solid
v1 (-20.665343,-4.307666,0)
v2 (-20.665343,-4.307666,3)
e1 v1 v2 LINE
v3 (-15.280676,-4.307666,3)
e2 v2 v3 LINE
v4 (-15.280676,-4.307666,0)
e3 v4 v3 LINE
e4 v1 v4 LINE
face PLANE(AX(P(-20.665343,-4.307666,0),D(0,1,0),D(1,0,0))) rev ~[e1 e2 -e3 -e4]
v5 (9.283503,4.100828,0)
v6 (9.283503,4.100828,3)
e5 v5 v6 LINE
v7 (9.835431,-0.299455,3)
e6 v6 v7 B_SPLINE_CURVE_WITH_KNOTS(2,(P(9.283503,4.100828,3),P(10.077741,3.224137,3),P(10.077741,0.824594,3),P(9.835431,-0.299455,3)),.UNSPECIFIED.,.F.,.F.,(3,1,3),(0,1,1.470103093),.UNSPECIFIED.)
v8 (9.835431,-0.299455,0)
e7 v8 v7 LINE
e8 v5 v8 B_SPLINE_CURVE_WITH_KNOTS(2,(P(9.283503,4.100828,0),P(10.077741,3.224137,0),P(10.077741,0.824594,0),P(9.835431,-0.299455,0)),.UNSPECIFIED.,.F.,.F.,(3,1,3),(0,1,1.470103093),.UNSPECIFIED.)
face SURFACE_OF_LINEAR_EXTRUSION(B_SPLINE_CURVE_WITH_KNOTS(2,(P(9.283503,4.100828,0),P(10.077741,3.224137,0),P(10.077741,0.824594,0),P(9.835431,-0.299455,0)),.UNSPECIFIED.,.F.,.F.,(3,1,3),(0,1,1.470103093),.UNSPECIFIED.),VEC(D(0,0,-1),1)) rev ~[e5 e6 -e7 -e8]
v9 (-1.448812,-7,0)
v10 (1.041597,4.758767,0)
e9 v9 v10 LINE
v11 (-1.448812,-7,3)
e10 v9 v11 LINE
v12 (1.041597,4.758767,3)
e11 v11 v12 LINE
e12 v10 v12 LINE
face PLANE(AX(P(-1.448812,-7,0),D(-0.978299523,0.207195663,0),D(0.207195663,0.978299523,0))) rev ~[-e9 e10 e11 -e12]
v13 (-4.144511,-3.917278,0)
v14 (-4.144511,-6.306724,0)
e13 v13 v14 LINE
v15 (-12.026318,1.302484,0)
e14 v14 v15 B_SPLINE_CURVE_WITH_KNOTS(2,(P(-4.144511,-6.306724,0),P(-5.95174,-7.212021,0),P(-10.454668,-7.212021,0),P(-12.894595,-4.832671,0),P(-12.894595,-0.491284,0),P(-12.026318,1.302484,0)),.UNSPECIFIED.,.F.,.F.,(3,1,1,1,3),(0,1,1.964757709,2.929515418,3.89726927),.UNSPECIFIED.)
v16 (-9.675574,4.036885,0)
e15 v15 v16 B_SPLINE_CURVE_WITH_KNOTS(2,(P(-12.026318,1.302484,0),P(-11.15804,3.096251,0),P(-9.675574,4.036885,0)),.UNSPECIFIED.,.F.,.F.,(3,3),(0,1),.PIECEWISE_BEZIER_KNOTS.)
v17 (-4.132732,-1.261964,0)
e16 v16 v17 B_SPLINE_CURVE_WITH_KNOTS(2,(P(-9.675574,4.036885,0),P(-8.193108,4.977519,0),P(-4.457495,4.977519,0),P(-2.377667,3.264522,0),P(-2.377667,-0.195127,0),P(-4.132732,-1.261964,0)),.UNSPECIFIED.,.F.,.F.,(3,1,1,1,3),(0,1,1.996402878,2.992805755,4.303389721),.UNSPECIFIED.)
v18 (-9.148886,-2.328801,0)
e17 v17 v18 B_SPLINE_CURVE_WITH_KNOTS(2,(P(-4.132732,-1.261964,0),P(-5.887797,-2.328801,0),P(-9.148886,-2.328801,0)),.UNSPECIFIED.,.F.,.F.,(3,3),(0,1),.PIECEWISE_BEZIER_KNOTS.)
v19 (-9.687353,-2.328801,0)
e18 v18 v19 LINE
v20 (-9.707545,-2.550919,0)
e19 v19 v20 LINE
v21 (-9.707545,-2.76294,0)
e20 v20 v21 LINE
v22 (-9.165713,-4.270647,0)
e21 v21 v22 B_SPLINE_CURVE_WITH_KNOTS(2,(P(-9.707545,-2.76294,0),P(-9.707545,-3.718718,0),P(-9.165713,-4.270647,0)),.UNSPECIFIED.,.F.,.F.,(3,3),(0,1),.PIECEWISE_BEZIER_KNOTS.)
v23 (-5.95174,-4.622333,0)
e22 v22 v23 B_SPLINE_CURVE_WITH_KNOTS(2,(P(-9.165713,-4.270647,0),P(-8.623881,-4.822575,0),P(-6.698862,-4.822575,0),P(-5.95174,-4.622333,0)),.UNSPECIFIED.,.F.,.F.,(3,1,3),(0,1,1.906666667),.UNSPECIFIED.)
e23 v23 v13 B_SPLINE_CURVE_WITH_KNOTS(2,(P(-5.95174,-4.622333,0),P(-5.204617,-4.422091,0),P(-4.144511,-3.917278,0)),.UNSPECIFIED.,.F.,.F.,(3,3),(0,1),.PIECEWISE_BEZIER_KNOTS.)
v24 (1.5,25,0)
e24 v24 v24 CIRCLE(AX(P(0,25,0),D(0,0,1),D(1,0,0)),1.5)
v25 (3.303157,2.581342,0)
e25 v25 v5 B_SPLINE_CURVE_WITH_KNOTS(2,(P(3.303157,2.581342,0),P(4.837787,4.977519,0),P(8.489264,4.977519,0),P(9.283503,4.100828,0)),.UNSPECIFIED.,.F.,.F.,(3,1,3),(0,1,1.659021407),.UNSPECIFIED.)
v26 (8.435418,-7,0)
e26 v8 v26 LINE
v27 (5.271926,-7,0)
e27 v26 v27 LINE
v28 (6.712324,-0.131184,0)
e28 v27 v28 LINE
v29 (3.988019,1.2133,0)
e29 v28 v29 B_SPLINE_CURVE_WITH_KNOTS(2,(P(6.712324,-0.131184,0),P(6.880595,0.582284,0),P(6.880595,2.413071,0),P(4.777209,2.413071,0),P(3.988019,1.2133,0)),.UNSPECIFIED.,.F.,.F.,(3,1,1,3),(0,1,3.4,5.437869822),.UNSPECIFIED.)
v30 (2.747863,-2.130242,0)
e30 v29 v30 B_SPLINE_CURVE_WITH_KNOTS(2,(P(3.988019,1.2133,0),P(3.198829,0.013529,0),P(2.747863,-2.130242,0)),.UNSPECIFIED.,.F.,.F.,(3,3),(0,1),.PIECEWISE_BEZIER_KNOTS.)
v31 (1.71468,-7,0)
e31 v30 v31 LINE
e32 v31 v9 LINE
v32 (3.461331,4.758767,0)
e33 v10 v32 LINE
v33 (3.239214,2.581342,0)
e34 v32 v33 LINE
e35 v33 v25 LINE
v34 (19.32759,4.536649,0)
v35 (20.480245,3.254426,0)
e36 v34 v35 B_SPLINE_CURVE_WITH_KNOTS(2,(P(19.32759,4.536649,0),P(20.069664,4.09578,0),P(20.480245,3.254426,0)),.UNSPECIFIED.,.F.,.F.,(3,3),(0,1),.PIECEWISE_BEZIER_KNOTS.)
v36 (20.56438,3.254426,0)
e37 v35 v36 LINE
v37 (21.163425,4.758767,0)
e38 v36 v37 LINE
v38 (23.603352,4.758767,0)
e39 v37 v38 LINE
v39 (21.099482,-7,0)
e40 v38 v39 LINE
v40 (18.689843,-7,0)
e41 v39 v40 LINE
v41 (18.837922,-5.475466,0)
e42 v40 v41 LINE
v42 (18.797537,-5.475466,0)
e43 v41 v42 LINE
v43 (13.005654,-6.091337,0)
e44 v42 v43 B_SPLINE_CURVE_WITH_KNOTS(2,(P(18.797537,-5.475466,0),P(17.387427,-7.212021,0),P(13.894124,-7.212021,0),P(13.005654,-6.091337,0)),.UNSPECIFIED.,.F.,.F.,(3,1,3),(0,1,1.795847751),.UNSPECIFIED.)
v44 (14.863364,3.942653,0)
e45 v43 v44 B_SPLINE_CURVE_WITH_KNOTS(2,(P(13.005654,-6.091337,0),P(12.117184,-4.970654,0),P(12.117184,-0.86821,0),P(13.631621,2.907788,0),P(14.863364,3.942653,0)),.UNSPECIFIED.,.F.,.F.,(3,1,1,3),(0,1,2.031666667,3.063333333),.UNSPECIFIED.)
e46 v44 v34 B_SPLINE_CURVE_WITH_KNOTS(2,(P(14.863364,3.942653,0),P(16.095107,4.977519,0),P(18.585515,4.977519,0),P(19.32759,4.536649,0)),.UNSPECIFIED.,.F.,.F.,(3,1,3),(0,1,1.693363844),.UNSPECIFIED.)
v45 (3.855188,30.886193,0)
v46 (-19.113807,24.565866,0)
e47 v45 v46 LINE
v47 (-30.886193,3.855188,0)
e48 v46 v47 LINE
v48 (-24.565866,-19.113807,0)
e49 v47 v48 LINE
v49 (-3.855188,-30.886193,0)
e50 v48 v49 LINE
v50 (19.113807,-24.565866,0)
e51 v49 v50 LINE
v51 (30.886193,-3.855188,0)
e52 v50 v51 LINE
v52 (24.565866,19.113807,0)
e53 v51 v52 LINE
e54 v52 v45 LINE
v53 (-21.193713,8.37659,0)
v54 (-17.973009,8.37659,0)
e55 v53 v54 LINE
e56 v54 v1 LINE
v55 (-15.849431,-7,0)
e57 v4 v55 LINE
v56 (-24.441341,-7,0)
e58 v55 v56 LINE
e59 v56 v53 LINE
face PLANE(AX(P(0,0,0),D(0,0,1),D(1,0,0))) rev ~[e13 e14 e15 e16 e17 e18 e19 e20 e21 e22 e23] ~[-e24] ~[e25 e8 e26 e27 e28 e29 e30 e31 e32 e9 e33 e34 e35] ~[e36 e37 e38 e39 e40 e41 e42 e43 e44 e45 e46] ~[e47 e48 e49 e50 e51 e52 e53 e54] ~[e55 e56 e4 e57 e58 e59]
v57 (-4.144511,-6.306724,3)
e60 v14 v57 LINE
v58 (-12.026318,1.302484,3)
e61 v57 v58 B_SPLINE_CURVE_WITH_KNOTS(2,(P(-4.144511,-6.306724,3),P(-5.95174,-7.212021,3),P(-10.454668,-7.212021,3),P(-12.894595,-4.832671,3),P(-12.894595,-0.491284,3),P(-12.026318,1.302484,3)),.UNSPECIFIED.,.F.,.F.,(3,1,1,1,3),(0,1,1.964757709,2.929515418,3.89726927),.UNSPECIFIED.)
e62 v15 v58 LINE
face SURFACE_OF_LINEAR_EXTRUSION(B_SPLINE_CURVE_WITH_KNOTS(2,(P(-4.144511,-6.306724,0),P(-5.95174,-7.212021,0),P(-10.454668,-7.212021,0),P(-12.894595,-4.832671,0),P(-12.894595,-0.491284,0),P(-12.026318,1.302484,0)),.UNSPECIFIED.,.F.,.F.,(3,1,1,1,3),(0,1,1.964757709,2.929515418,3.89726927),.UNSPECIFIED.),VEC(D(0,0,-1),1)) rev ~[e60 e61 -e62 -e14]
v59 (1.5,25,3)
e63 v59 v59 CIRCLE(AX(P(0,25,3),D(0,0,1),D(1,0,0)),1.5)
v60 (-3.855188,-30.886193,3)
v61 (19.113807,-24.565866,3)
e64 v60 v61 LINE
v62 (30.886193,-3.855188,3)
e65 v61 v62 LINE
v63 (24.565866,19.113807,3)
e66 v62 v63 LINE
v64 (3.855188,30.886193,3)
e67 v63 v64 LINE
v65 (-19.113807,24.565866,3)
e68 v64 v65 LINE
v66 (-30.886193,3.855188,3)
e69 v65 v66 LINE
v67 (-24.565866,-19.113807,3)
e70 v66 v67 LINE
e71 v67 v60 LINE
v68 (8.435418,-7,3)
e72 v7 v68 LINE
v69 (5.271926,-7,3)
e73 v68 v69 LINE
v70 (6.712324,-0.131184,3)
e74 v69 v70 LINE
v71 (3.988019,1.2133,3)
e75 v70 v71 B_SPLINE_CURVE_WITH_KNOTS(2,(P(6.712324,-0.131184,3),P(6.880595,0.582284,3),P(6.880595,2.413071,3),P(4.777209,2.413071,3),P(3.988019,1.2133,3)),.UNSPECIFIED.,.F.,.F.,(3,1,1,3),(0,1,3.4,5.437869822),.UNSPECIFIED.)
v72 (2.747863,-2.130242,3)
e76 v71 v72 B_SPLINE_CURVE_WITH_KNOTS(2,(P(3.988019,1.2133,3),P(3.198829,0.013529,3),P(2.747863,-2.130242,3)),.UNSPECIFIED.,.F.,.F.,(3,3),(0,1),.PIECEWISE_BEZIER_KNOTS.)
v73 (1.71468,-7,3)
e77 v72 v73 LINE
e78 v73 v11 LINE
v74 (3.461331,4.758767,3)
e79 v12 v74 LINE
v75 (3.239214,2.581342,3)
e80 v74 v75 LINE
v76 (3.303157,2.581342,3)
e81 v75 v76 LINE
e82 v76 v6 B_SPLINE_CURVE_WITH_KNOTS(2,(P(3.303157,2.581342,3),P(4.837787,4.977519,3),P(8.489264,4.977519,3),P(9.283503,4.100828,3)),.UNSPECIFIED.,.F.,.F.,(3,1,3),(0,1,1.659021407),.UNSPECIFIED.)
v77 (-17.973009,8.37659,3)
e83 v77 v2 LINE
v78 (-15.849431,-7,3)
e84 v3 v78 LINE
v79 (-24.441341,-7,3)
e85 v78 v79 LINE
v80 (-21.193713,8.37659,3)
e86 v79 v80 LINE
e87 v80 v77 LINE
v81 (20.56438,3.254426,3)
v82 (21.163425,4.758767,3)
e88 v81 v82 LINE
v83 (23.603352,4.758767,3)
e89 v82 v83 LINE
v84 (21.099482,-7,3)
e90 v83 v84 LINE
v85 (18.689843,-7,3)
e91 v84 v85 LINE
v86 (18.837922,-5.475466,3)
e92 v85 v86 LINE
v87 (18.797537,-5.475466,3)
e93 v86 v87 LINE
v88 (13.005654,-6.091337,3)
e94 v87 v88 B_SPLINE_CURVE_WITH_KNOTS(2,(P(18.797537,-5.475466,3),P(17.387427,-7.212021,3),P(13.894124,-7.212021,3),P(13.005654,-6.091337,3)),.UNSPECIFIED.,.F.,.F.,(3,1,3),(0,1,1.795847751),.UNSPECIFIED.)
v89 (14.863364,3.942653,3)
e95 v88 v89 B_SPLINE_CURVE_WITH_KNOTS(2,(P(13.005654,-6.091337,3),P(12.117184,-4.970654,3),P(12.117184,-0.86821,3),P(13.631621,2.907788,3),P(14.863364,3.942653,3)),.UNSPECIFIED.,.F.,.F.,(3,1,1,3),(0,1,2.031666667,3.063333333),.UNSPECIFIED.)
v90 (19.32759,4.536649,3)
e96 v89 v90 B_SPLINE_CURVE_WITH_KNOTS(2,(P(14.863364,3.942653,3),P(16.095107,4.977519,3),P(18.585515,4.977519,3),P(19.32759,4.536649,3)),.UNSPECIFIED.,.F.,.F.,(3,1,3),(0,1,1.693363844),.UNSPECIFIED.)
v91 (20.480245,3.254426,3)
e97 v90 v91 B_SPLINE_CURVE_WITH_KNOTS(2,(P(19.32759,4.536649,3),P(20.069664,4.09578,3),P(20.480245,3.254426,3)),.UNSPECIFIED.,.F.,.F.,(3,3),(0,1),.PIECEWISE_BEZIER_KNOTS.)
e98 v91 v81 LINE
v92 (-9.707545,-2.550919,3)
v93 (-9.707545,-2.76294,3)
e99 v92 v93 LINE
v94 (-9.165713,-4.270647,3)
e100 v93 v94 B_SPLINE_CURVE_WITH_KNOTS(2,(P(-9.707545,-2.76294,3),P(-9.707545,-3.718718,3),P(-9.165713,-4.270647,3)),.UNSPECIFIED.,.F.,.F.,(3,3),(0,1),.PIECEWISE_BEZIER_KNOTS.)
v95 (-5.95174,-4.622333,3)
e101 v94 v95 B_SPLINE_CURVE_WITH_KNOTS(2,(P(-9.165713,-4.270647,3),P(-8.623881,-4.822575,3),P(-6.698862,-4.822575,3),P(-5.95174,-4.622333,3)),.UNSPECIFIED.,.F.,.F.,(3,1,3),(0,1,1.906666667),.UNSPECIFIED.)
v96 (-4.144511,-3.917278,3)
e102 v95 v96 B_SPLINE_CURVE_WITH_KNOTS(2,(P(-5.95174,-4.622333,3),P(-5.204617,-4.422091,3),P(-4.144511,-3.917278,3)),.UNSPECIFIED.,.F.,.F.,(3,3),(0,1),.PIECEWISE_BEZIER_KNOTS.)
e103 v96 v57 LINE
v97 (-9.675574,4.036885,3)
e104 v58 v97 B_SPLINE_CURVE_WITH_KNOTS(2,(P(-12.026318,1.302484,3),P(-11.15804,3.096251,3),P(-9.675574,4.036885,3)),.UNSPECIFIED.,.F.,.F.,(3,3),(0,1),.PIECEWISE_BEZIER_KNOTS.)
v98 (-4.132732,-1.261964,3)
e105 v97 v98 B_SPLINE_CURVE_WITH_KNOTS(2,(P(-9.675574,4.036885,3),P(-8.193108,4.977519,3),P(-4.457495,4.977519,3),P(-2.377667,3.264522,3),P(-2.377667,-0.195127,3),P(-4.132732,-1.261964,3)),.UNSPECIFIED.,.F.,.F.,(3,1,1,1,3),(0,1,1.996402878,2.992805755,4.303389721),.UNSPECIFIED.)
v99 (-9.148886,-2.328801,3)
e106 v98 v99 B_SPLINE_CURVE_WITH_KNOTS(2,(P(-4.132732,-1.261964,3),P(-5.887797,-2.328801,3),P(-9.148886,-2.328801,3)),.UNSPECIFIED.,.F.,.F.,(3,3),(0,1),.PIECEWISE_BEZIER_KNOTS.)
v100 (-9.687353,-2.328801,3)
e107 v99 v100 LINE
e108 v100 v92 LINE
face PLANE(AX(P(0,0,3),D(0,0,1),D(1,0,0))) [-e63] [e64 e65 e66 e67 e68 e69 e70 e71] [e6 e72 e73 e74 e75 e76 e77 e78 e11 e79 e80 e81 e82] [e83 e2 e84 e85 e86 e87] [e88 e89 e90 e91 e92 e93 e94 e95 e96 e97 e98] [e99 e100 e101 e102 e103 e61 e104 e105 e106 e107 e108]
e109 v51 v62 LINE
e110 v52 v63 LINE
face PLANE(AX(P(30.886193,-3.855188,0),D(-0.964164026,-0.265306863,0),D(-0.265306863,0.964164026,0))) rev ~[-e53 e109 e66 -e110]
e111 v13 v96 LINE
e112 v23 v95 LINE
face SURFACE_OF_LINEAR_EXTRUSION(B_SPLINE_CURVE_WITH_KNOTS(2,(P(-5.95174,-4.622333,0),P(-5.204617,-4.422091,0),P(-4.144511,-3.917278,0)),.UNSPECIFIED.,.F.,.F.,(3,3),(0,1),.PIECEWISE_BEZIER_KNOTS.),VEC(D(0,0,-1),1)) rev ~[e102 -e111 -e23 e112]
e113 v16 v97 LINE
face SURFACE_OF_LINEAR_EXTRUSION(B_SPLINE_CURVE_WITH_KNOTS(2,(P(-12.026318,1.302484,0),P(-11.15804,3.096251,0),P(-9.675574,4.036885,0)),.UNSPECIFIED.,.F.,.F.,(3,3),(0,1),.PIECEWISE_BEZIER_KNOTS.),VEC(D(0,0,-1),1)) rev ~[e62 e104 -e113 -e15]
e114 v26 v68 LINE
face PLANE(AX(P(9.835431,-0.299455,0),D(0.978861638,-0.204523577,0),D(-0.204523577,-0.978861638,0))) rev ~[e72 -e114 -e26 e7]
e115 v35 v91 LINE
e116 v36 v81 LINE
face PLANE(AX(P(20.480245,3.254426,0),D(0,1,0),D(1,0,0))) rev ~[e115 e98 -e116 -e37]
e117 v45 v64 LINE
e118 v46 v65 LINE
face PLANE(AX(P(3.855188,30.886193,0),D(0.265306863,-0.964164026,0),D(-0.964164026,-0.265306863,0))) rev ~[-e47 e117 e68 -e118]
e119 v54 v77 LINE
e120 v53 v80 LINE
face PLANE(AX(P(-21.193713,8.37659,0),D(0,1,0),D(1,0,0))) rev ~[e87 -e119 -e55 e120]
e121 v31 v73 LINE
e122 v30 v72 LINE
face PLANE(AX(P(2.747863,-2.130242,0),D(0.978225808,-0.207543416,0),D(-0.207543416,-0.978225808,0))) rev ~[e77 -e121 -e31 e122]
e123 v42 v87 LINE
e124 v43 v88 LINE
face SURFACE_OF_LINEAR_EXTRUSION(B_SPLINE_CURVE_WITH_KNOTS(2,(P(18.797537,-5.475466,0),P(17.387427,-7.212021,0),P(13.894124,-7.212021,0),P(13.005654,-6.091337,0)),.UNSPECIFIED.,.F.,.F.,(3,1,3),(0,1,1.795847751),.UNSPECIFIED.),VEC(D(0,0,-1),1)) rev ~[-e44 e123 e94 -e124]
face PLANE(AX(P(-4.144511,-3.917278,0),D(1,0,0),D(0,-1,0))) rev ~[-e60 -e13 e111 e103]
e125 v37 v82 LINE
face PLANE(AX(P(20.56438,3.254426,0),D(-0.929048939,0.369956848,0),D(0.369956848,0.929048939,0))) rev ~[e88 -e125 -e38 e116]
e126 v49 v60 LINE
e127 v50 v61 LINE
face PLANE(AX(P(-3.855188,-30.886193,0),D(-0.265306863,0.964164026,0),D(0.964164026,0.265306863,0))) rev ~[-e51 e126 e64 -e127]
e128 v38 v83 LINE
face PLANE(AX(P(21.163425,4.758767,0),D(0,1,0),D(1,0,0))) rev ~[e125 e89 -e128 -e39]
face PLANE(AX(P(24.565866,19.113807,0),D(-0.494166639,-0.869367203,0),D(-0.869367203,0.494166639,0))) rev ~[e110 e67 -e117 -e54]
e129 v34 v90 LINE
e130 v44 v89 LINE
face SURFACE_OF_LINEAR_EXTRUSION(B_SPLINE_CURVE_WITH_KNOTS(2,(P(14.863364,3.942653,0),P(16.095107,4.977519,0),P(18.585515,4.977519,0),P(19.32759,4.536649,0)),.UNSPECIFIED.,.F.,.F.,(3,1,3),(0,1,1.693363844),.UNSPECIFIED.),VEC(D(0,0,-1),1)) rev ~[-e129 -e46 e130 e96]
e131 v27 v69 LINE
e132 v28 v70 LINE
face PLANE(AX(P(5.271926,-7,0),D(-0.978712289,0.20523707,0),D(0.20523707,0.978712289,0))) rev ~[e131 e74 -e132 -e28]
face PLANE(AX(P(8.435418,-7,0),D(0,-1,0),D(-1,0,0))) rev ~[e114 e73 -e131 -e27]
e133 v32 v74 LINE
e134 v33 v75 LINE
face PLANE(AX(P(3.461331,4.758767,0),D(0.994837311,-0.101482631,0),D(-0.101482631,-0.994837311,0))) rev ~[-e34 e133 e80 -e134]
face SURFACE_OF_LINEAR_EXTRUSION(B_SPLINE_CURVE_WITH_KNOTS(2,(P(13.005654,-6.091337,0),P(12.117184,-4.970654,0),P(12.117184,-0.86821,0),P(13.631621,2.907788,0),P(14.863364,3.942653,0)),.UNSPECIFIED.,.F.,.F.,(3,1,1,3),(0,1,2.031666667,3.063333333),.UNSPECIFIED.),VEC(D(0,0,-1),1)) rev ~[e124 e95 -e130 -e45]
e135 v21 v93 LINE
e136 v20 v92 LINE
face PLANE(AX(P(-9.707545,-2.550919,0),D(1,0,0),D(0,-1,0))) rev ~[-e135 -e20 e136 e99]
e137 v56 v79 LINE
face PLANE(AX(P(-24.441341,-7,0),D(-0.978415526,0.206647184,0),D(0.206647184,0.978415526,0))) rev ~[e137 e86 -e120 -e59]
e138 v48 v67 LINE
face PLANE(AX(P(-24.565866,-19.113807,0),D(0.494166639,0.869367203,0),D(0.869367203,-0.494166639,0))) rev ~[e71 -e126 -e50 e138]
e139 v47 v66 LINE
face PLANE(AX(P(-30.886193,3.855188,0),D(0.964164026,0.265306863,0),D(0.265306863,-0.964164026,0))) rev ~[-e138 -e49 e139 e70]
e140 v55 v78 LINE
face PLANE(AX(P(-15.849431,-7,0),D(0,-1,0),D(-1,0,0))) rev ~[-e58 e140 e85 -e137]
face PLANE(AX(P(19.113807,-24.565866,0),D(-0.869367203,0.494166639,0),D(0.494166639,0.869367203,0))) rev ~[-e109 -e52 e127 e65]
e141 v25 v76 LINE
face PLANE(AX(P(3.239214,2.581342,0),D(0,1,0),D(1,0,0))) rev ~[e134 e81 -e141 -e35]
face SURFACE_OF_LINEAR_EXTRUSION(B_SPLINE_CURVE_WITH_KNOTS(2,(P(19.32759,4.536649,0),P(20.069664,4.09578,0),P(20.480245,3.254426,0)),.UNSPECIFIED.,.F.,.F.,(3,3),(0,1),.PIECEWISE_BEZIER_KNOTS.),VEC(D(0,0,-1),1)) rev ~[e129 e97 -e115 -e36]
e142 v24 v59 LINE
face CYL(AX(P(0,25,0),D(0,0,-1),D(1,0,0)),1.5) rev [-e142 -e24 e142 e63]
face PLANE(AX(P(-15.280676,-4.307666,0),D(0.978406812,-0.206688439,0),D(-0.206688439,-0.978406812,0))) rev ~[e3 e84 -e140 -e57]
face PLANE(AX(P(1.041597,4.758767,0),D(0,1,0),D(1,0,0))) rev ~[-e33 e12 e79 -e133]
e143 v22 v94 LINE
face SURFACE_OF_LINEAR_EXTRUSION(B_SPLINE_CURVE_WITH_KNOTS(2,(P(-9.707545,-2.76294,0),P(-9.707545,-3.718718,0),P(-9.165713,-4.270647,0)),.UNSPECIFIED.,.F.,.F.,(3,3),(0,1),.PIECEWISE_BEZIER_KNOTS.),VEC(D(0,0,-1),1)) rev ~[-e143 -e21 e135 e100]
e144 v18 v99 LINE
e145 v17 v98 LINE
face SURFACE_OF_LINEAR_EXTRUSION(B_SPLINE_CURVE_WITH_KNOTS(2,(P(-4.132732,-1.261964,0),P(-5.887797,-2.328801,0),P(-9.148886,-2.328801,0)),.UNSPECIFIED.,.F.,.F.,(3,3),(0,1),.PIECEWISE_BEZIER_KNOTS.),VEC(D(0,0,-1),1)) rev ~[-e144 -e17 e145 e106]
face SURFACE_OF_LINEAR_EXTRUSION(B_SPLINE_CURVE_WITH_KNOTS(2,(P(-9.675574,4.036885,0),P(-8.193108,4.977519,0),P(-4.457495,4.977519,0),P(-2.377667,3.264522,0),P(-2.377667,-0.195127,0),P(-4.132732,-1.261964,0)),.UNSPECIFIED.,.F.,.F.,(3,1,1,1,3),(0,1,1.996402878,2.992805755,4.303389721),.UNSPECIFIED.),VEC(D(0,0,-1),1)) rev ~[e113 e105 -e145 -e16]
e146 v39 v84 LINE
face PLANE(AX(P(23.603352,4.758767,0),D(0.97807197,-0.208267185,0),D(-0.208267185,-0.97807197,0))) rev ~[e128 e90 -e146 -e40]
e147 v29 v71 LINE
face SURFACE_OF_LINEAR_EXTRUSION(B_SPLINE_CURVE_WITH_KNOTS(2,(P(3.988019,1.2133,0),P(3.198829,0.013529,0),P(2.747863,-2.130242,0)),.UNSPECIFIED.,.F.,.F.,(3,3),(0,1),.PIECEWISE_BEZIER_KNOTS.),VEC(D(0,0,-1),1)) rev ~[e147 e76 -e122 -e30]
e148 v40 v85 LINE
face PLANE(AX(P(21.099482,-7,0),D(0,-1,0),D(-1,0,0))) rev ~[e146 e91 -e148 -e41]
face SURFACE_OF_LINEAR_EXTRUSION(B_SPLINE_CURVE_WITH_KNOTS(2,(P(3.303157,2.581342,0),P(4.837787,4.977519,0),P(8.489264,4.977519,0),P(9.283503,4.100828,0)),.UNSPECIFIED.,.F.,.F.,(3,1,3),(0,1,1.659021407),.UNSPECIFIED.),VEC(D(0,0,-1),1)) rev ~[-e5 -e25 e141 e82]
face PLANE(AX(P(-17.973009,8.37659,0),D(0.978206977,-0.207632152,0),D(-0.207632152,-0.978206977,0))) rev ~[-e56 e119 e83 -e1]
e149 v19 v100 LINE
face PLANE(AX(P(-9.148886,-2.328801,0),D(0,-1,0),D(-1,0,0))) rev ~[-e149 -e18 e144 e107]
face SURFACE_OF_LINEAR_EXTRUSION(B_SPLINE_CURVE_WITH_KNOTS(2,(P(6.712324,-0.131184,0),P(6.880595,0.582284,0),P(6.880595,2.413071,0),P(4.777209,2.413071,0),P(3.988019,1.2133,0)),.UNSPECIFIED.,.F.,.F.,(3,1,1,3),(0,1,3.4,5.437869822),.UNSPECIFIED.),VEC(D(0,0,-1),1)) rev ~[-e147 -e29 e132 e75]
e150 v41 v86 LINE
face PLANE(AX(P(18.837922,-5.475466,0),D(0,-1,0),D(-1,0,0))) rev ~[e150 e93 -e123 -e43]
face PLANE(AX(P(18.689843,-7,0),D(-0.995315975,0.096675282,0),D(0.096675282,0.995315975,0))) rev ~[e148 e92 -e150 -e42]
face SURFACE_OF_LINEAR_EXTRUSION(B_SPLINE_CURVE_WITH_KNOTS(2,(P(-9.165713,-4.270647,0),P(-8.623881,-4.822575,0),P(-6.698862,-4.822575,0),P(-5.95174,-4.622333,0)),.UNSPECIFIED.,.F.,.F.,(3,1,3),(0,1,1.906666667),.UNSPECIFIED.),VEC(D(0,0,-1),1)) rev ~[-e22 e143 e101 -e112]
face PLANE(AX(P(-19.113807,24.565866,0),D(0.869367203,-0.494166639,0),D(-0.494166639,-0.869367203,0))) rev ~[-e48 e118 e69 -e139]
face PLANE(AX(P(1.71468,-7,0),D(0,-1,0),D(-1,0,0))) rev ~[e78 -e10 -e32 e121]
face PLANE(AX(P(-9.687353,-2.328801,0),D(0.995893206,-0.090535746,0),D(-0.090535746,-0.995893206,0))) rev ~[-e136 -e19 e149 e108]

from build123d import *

# Parameters (mm, degrees)
F1_R     = 1.5
F2_DEPTH = 3


with BuildPart() as f2:
    # F1 (on Top) → F2 (new body)
    with BuildSketch(Plane.XY):
        Polygon((19.1138070579, -24.5658658908), (30.8861929421, -3.8551877721), (24.5658658908, 19.1138070579), (3.8551877721, 30.8861929421), (-19.1138070579, 24.5658658908), (-30.8861929421, 3.8551877721), (-24.5658658908, -19.1138070579), (-3.8551877721, -30.8861929421), align=None)
        with BuildLine():
            add(Edge.make_bspline(
                [(-4.1445110049, -6.3067241031), (-5.9517399206, -7.2120212694), (-8.2435888807, -7.2120212694)],
                knots=[0, 0, 0, 1, 1, 1], degree=2))
            add(Edge.make_bspline(
                [(-8.2435888807, -7.2120212694), (-10.4546678333, -7.2120212694), (-11.6746314868, -6.0223463687)],
                knots=[0, 0, 0, 1, 1, 1], degree=2))
            add(Edge.make_bspline(
                [(-11.6746314868, -6.0223463687), (-12.8945951403, -4.832671468), (-12.8945951403, -2.665342936)],
                knots=[0, 0, 0, 1, 1, 1], degree=2))
            add(Edge.make_bspline(
                [(-12.8945951403, -2.665342936), (-12.8945951403, -0.49128357), (-12.0263175607, 1.3024836777)],
                knots=[0, 0, 0, 1, 1, 1], degree=2))
            add(Edge.make_bspline(
                [(-12.0263175607, 1.3024836777), (-11.1580399812, 3.0962509255), (-9.6755738036, 4.03688497)],
                knots=[0, 0, 0, 1, 1, 1], degree=2))
            add(Edge.make_bspline(
                [(-9.6755738036, 4.03688497), (-8.193107626, 4.9775190146), (-6.3219357878, 4.9775190146)],
                knots=[0, 0, 0, 1, 1, 1], degree=2))
            add(Edge.make_bspline(
                [(-6.3219357878, 4.9775190146), (-4.4574947836, 4.9775190146), (-3.4175809383, 4.1210203944)],
                knots=[0, 0, 0, 1, 1, 1], degree=2))
            add(Edge.make_bspline(
                [(-3.4175809383, 4.1210203944), (-2.377667093, 3.2645217742), (-2.377667093, 1.7702766373)],
                knots=[0, 0, 0, 1, 1, 1], degree=2))
            add(Edge.make_bspline(
                [(-2.377667093, 1.7702766373), (-2.377667093, -0.1951268762), (-4.1327320455, -1.2619640573)],
                knots=[0, 0, 0, 1, 1, 1], degree=2))
            add(Edge.make_bspline(
                [(-4.1327320455, -1.2619640573), (-5.887796998, -2.3288012385), (-9.148886047, -2.3288012385)],
                knots=[0, 0, 0, 1, 1, 1], degree=2))
            Line((-9.148886047, -2.3288012385), (-9.687352763, -2.3288012385))
            Line((-9.687352763, -2.3288012385), (-9.7075452649, -2.5509187588))
            Line((-9.7075452649, -2.5509187588), (-9.7075452649, -2.7629400283))
            add(Edge.make_bspline(
                [(-9.7075452649, -2.7629400283), (-9.7075452649, -3.7187184492), (-9.1657131319, -4.2706468331)],
                knots=[0, 0, 0, 1, 1, 1], degree=2))
            add(Edge.make_bspline(
                [(-9.1657131319, -4.2706468331), (-8.6238809989, -4.8225752171), (-7.6142559063, -4.8225752171)],
                knots=[0, 0, 0, 1, 1, 1], degree=2))
            add(Edge.make_bspline(
                [(-7.6142559063, -4.8225752171), (-6.6988624891, -4.8225752171), (-5.9517399206, -4.622332907)],
                knots=[0, 0, 0, 1, 1, 1], degree=2))
            add(Edge.make_bspline(
                [(-5.9517399206, -4.622332907), (-5.2046173521, -4.422090597), (-4.1445110049, -3.9172780508)],
                knots=[0, 0, 0, 1, 1, 1], degree=2))
            Line((-4.1445110049, -3.9172780508), (-4.1445110049, -6.3067241031))
        make_face(mode=Mode.SUBTRACT)
        with BuildLine():
            Line((9.8354311099, -0.2994548025), (8.4354176482, -7))
            Line((8.4354176482, -7), (5.2719256916, -7))
            Line((5.2719256916, -7), (6.712324157, -0.1311839537))
            add(Edge.make_bspline(
                [(6.712324157, -0.1311839537), (6.8805950057, 0.582284445), (6.8805950057, 1.1207511611)],
                knots=[0, 0, 0, 1, 1, 1], degree=2))
            add(Edge.make_bspline(
                [(6.8805950057, 1.1207511611), (6.8805950057, 2.4130712795), (5.7430840681, 2.4130712795)],
                knots=[0, 0, 0, 1, 1, 1], degree=2))
            add(Edge.make_bspline(
                [(5.7430840681, 2.4130712795), (4.7772093962, 2.4130712795), (3.9880191156, 1.2133001279)],
                knots=[0, 0, 0, 1, 1, 1], degree=2))
            add(Edge.make_bspline(
                [(3.9880191156, 1.2133001279), (3.1988288349, 0.0135289762), (2.7478629602, -2.1302416369)],
                knots=[0, 0, 0, 1, 1, 1], degree=2))
            Line((2.7478629602, -2.1302416369), (1.7146799488, -7))
            Line((1.7146799488, -7), (-1.4488120078, -7))
            Line((-1.4488120078, -7), (1.0415965538, 4.7587669112))
            Line((1.0415965538, 4.7587669112), (3.461331359, 4.7587669112))
            Line((3.461331359, 4.7587669112), (3.2392138386, 2.5813421283))
            Line((3.2392138386, 2.5813421283), (3.3031567611, 2.5813421283))
            add(Edge.make_bspline(
                [(3.3031567611, 2.5813421283), (4.8377869018, 4.9775190146), (7.0387696036, 4.9775190146)],
                knots=[0, 0, 0, 1, 1, 1], degree=2))
            add(Edge.make_bspline(
                [(7.0387696036, 4.9775190146), (8.4892643198, 4.9775190146), (9.283502726, 4.1008278926)],
                knots=[0, 0, 0, 1, 1, 1], degree=2))
            add(Edge.make_bspline(
                [(9.283502726, 4.1008278926), (10.0777411321, 3.2241367705), (10.0777411321, 1.5919095376)],
                knots=[0, 0, 0, 1, 1, 1], degree=2))
            add(Edge.make_bspline(
                [(10.0777411321, 1.5919095376), (10.0777411321, 0.8245944673), (9.8354311099, -0.2994548025)],
                knots=[0, 0, 0, 1, 1, 1], degree=2))
        make_face(mode=Mode.SUBTRACT)
        with BuildLine():
            add(Edge.make_bspline(
                [(18.7975365148, -5.4754661103), (17.3874268022, -7.2120212694), (15.4422157905, -7.2120212694)],
                knots=[0, 0, 0, 1, 1, 1], degree=2))
            add(Edge.make_bspline(
                [(15.4422157905, -7.2120212694), (13.894123982, -7.2120212694), (13.0056539005, -6.0913374167)],
                knots=[0, 0, 0, 1, 1, 1], degree=2))
            add(Edge.make_bspline(
                [(13.0056539005, -6.0913374167), (12.1171838191, -4.970653564), (12.1171838191, -2.9514033789)],
                knots=[0, 0, 0, 1, 1, 1], degree=2))
            add(Edge.make_bspline(
                [(12.1171838191, -2.9514033789), (12.1171838191, -0.8682102713), (12.8744026385, 1.0197886518)],
                knots=[0, 0, 0, 1, 1, 1], degree=2))
            add(Edge.make_bspline(
                [(12.8744026385, 1.0197886518), (13.6316214579, 2.9077875749), (14.8633640708, 3.9426532947)],
                knots=[0, 0, 0, 1, 1, 1], degree=2))
            add(Edge.make_bspline(
                [(14.8633640708, 3.9426532947), (16.0951066837, 4.9775190146), (17.5657939019, 4.9775190146)],
                knots=[0, 0, 0, 1, 1, 1], degree=2))
            add(Edge.make_bspline(
                [(17.5657939019, 4.9775190146), (18.5855152453, 4.9775190146), (19.3275896884, 4.5366493909)],
                knots=[0, 0, 0, 1, 1, 1], degree=2))
            add(Edge.make_bspline(
                [(19.3275896884, 4.5366493909), (20.0696641314, 4.0957797671), (20.4802450024, 3.2544255233)],
                knots=[0, 0, 0, 1, 1, 1], degree=2))
            Line((20.4802450024, 3.2544255233), (20.5643804267, 3.2544255233))
            Line((20.5643804267, 3.2544255233), (21.1634246483, 4.7587669112))
            Line((21.1634246483, 4.7587669112), (23.6033519553, 4.7587669112))
            Line((23.6033519553, 4.7587669112), (21.0994817258, -7))
            Line((21.0994817258, -7), (18.6898431716, -7))
            Line((18.6898431716, -7), (18.8379215185, -5.4754661103))
            Line((18.8379215185, -5.4754661103), (18.7975365148, -5.4754661103))
        make_face(mode=Mode.SUBTRACT)
        Polygon((-15.8494312445, -7), (-24.4413407821, -7), (-21.1937134011, 8.3765901595), (-17.9730093559, 8.3765901595), (-20.665342936, -4.3076664199), (-15.2806757757, -4.3076664199), align=None, mode=Mode.SUBTRACT)
        with Locations((0, 25)):
            Circle(F1_R, mode=Mode.SUBTRACT)
    extrude(amount=F2_DEPTH)


solid = f2.part
